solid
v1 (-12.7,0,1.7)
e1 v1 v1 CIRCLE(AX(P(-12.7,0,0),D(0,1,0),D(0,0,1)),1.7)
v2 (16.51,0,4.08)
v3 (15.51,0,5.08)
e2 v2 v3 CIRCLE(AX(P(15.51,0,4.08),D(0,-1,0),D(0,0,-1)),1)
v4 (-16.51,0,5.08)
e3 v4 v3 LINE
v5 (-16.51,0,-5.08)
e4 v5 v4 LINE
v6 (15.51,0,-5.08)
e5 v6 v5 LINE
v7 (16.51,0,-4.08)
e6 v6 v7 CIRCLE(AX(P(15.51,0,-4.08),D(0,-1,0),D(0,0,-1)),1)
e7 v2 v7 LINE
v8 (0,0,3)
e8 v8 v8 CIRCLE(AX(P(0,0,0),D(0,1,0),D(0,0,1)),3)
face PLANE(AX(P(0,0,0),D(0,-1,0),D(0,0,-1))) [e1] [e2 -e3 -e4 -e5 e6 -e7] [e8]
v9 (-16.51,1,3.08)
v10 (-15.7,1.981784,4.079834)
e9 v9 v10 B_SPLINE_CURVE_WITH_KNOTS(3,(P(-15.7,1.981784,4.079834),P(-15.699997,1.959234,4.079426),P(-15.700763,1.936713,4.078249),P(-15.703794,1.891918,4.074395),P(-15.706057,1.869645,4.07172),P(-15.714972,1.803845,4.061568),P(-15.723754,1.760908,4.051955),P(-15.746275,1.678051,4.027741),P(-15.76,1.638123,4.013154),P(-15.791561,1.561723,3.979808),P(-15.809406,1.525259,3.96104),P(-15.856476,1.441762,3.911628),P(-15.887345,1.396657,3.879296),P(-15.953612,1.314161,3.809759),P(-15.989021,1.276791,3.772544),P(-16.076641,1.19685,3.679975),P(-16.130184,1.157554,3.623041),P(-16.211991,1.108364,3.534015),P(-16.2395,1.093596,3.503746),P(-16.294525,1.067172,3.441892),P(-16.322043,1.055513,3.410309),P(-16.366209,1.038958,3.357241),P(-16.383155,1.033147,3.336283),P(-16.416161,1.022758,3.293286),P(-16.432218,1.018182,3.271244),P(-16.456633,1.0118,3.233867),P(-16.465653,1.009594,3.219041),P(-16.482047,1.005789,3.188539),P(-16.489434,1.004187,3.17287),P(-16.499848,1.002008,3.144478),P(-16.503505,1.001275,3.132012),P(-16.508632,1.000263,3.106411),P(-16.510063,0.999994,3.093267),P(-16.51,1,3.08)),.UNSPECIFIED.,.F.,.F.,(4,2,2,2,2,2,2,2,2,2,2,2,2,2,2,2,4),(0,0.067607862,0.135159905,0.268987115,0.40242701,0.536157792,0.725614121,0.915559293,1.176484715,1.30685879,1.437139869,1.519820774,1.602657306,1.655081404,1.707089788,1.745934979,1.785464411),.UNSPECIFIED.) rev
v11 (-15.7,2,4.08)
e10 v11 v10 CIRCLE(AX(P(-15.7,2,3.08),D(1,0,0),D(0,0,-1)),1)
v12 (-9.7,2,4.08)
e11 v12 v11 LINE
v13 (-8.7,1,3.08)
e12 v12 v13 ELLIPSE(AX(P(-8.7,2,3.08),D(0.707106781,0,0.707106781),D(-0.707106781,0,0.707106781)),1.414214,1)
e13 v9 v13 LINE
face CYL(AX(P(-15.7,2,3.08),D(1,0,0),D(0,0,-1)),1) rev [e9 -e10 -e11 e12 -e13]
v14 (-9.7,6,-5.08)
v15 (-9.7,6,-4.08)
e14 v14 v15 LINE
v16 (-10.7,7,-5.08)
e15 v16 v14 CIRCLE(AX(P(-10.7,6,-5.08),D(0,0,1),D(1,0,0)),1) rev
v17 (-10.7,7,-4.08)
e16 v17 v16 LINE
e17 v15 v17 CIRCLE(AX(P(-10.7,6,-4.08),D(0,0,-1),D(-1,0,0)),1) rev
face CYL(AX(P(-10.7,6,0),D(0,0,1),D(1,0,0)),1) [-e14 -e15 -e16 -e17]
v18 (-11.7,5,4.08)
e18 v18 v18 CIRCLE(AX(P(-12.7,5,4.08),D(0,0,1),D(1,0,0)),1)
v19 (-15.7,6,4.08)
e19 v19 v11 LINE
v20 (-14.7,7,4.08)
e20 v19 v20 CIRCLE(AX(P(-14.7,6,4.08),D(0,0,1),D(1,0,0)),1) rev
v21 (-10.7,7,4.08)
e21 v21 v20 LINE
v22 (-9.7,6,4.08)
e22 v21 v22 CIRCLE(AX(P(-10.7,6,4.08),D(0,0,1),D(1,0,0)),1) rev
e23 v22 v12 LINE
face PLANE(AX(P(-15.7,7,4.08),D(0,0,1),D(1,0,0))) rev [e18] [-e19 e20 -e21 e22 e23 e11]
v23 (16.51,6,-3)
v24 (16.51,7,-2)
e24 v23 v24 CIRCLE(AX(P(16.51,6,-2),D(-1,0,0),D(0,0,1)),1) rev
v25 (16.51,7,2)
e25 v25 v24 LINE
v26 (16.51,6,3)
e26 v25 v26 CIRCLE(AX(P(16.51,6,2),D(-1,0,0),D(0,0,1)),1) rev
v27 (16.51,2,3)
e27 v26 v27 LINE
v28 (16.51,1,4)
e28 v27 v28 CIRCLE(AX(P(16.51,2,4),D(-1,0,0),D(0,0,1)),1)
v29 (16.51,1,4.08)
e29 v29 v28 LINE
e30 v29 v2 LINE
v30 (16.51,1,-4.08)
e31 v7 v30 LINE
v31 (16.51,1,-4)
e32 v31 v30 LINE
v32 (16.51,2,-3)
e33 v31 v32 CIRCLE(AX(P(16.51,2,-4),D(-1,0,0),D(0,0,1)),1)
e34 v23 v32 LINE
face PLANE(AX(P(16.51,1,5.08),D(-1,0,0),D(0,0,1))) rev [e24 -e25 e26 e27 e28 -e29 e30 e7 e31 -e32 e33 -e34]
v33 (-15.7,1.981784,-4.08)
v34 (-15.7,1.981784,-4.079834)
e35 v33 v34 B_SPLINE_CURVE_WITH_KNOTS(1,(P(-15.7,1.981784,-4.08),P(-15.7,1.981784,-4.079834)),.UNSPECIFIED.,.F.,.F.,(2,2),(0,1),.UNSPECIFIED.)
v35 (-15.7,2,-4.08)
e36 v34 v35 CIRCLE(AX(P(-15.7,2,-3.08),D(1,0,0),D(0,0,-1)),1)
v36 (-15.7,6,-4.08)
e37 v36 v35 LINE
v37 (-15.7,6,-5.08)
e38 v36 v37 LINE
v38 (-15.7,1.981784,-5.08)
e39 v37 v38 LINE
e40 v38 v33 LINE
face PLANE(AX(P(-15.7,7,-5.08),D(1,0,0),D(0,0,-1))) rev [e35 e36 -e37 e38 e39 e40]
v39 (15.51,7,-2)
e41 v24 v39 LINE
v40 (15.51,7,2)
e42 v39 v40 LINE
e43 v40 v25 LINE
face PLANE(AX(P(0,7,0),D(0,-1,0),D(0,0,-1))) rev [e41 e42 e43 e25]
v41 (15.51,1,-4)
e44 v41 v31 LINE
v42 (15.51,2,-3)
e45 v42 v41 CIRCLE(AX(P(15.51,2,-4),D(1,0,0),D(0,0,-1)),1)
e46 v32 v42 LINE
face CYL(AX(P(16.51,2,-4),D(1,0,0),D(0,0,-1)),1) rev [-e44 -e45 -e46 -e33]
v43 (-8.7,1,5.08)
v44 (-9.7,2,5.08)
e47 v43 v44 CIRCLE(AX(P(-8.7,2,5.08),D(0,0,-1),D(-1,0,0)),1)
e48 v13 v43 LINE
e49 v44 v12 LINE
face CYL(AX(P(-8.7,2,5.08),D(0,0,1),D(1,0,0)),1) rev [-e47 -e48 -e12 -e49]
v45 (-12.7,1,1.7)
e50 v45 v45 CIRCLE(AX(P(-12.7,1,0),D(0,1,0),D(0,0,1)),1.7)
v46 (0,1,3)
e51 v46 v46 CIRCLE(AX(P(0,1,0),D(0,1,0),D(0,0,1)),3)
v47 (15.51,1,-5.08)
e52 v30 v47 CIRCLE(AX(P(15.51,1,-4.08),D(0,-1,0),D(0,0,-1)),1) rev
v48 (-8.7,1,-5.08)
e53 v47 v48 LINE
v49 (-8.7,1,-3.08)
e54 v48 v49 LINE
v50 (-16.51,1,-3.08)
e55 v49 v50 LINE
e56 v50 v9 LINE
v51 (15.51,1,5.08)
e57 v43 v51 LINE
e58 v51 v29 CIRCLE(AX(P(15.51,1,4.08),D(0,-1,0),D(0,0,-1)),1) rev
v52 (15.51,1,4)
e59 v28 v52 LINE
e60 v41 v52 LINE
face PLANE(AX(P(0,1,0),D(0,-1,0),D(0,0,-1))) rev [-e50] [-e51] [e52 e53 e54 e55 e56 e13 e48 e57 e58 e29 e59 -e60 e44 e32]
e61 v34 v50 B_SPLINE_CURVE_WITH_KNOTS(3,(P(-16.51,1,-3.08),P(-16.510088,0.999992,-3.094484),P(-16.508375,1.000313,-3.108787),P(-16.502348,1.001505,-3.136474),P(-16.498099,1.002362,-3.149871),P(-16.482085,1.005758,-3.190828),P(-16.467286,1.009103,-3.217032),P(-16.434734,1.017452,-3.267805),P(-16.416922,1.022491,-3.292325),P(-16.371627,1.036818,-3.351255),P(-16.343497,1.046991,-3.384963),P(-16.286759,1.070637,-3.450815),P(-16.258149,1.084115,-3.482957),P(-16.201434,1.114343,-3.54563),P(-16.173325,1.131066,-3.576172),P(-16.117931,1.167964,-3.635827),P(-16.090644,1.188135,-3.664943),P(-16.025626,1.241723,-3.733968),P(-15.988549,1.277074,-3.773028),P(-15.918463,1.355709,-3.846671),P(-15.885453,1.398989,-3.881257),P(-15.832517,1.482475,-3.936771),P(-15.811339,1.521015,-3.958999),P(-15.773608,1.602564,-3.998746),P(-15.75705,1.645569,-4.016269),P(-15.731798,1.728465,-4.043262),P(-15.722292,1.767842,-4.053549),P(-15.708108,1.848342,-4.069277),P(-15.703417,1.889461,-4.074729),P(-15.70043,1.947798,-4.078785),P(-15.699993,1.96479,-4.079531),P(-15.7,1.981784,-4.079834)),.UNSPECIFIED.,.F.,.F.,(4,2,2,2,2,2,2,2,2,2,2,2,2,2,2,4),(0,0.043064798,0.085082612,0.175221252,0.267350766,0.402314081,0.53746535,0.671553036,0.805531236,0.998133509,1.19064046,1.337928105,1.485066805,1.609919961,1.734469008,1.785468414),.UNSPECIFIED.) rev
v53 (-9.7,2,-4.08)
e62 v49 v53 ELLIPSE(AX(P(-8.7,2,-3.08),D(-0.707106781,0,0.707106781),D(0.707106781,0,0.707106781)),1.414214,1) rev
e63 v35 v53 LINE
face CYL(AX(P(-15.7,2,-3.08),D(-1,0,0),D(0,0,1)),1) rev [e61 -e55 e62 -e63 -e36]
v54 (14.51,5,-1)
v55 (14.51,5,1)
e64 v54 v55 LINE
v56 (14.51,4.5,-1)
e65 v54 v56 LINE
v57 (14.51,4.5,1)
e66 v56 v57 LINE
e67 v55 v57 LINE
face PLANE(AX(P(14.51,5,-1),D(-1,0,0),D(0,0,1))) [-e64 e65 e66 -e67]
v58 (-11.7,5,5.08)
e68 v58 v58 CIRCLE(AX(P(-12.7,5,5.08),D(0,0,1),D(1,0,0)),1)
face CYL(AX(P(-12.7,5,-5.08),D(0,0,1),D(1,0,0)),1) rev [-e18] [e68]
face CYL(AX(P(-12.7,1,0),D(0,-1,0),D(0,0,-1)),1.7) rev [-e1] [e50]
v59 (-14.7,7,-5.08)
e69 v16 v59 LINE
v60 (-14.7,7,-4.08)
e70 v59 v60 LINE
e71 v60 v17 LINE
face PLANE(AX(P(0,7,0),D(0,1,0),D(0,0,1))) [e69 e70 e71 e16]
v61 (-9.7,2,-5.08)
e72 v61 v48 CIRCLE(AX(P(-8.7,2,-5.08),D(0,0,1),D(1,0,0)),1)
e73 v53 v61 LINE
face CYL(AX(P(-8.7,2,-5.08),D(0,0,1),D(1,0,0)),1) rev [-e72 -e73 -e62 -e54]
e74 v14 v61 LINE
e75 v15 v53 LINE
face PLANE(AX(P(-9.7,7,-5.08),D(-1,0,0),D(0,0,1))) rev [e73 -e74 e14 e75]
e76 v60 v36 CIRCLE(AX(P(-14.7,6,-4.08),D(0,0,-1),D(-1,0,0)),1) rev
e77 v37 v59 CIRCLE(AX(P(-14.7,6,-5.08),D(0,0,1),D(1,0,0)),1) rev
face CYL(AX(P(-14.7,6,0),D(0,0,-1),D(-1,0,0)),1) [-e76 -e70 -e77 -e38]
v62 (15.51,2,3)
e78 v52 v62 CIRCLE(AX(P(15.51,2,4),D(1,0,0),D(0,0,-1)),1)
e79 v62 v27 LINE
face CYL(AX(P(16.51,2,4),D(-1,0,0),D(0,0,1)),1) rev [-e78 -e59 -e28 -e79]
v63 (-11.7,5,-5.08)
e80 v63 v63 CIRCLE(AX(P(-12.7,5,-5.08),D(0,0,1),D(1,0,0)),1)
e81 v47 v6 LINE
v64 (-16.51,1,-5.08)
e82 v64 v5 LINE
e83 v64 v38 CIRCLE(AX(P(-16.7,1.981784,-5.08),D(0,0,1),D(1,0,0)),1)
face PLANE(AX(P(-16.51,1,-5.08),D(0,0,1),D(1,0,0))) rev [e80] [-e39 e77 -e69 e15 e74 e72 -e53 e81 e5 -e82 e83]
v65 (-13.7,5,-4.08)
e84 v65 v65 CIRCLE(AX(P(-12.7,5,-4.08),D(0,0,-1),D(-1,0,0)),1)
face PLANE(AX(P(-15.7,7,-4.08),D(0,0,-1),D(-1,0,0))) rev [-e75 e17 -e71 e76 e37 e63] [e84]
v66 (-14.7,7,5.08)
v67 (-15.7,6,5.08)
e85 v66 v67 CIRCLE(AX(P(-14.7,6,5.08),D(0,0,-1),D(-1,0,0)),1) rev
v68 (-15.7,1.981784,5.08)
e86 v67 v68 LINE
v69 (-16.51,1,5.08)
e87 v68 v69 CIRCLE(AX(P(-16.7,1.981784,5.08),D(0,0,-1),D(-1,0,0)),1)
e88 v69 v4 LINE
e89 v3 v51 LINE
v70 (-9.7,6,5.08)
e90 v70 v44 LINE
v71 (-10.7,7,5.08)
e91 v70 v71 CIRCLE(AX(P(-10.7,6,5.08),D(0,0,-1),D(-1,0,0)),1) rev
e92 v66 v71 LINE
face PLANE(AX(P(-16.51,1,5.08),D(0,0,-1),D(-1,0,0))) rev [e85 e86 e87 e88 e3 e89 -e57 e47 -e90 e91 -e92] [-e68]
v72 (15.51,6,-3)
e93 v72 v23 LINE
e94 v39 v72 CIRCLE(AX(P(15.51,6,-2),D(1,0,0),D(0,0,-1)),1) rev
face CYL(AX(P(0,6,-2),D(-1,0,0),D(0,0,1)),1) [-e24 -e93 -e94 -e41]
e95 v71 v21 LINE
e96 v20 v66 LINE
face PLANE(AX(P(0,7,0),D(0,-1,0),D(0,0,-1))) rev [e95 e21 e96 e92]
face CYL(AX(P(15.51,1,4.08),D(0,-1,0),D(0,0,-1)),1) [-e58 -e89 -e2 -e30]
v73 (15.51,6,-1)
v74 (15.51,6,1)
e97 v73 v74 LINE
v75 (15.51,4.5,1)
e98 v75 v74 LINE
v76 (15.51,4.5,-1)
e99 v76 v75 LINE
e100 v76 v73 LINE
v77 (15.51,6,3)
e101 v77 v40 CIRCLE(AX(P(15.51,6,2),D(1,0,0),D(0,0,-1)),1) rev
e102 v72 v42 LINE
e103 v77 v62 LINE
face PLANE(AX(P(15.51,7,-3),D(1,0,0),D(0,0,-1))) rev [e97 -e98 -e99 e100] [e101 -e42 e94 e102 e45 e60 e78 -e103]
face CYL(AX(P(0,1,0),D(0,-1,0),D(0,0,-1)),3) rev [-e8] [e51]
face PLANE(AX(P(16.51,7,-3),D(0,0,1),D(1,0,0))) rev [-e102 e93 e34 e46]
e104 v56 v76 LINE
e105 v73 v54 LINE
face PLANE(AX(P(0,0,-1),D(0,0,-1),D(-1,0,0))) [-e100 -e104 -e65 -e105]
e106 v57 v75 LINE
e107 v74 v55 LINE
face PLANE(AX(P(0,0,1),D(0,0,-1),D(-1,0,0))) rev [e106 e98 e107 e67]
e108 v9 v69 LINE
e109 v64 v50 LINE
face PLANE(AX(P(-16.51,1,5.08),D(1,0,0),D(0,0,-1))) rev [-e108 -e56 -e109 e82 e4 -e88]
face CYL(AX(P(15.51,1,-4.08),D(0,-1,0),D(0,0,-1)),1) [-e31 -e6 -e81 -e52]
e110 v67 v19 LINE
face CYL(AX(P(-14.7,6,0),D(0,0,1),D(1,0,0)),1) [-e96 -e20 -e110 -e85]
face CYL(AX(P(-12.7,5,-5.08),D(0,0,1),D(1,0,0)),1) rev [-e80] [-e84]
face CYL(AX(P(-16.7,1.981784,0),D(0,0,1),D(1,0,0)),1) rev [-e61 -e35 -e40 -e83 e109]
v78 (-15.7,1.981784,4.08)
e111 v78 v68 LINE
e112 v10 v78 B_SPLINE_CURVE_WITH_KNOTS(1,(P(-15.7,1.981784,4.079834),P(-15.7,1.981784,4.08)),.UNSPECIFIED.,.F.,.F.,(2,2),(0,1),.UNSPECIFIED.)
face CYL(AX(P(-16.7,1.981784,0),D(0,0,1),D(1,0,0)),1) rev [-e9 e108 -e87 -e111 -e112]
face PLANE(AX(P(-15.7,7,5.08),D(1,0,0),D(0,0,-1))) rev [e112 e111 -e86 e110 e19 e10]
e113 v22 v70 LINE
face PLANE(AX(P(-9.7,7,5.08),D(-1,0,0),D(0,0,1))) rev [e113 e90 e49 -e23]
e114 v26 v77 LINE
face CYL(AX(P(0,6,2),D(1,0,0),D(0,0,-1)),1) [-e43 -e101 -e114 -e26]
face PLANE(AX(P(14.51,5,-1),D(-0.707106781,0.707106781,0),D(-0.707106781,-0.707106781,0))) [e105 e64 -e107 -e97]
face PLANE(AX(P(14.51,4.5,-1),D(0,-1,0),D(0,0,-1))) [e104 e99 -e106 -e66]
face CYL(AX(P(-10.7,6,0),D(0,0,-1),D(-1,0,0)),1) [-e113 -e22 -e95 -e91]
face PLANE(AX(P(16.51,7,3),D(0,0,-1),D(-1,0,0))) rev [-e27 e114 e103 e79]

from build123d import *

# Parameters (mm, degrees)
SKETCH1_W                = 33.02
SKETCH1_H                = 10.16
SKETCH1_R                = 3
SKETCH1_R_2              = 1.7
BOSS_EXTRUDE1_DEPTH      = 1
SKETCH2_W                = 6
SKETCH2_H                = 1
SKETCH2_W_2              = 1
SKETCH2_H_2              = 6
BOSS_EXTRUDE2_DEPTH      = 6
SKETCH3_R                = 1
CUT_EXTRUDE1_DEPTH       = 21.610815122
FILLET1_R                = 1
BOSS_EXTRUDE3_DEPTH      = 1
BOSS_EXTRUDE3_DEPTH_BACK = 1


with BuildPart() as part:
    # Sketch1 → Boss-Extrude1 (new body)
    with BuildSketch(Plane(origin=(0, 0, 0), x_dir=(1, 0, 0), z_dir=(0, 1, 0))):
        Rectangle(SKETCH1_W, SKETCH1_H)
        with Locations(Location((0, 0, 0), (0, 0, 270))):
            Circle(SKETCH1_R, mode=Mode.SUBTRACT)
        with Locations(Location((-12.7, 0, 0), (0, 0, 270))):
            Circle(SKETCH1_R_2, mode=Mode.SUBTRACT)
    extrude(amount=BOSS_EXTRUDE1_DEPTH)

    # Sketch2 → Boss-Extrude2 (add)
    with BuildSketch(Plane(origin=(0, 1, 0), x_dir=(1, 0, 0), z_dir=(0, 1, 0))):
        with Locations((-12.7, 4.58)):
            Rectangle(SKETCH2_W, SKETCH2_H)
        with Locations((-12.7, -4.58)):
            Rectangle(SKETCH2_W, SKETCH2_H)
        with Locations((16.01, 0)):
            Rectangle(SKETCH2_W_2, SKETCH2_H_2)
    extrude(amount=BOSS_EXTRUDE2_DEPTH)

    # Sketch3 → Cut-Extrude1 (cut, through all)
    with BuildSketch(Plane.XY.offset(5.08)):
        with Locations((-12.7, 5)):
            Circle(SKETCH3_R)
    extrude(amount=-CUT_EXTRUDE1_DEPTH, mode=Mode.SUBTRACT)

    # Fillet1
    # the kernel refuses this fillet: 1 mm, written as the material it adds along each edge
    with BuildSketch(Plane(origin=(-15.7, 1, -4.08), x_dir=(-1, 0, 0), z_dir=(0, 0, -1))) as fillet1_piece_1:
        with BuildLine():
            CenterArc((1, 0.98178409), FILLET1_R, 180, 79.047215801)
            Line((0, 0.98178409), (0, 0))
            Line((0, 0), (0.81, 0))
        make_face()
    extrude(amount=1)
    with BuildSketch(Plane(origin=(-9.7, 1, -4.08), x_dir=(0, 0, 1), z_dir=(-1, 0, 0))) as fillet1_piece_2:
        with BuildLine():
            CenterArc((FILLET1_R, FILLET1_R), FILLET1_R, 180, 90)
            Line((0, FILLET1_R), (0, 0))
            Line((0, 0), (FILLET1_R, 0))
        make_face()
    extrude(amount=6)
    with BuildSketch(Plane(origin=(-9.7, 1, -5.08), x_dir=(1, 0, 0), z_dir=(0, 0, 1))) as fillet1_piece_3:
        with BuildLine():
            CenterArc((FILLET1_R, FILLET1_R), FILLET1_R, 180, 90)
            Line((0, FILLET1_R), (0, 0))
            Line((0, 0), (FILLET1_R, 0))
        make_face()
    extrude(amount=1)
    with BuildSketch(Plane(origin=(16.51, 1, -3), x_dir=(0, 0, -1), z_dir=(-1, 0, 0)), Plane(origin=(15.51, 1, 3), x_dir=(0, 0, 1), z_dir=(1, 0, 0)), Plane(origin=(-9.7, 1, 5.08), x_dir=(1, 0, 0), z_dir=(0, 0, -1))) as fillet1_piece_4:
        with BuildLine():
            CenterArc((FILLET1_R, -FILLET1_R), FILLET1_R, 90, 90)
            Line((0, -FILLET1_R), (0, 0))
            Line((0, 0), (FILLET1_R, 0))
        make_face()
    extrude(amount=1)
    with BuildSketch(Plane(origin=(-15.7, 1, 4.08), x_dir=(-1, 0, 0), z_dir=(0, 0, 1))) as fillet1_piece_5:
        with BuildLine():
            CenterArc((1, -0.98178409), FILLET1_R, 100.952784199, 79.047215801)
            Line((0, -0.98178409), (0, 0))
            Line((0, 0), (0.81, 0))
        make_face()
    extrude(amount=1)
    with BuildSketch(Plane(origin=(-9.7, 1, 4.08), x_dir=(0, 0, -1), z_dir=(-1, 0, 0))) as fillet1_piece_6:
        with BuildLine():
            CenterArc((FILLET1_R, -FILLET1_R), FILLET1_R, 90, 90)
            Line((0, -FILLET1_R), (0, 0))
            Line((0, 0), (FILLET1_R, 0))
        make_face()
    extrude(amount=6)
    with BuildSketch(Plane(origin=(-15.7, 1, -1.625539774), x_dir=(-1, 0, 0), z_dir=(0, 0, -1))) as fillet1_piece_7a_section:
        with BuildLine():
            CenterArc((1, 0.98178409), FILLET1_R, 180, 79.047215801)
            Line((0, 0.98178409), (0, 0))
            Line((0, 0), (0.81, 0))
        make_face()
    fillet1_piece_7a = extrude(amount=3.454460226, mode=Mode.PRIVATE)
    fillet1_piece_7a = split(fillet1_piece_7a, bisect_by=Plane(origin=(-15.7, 1, -4.08), z_dir=(0, 0, 1)), keep=Keep.TOP, mode=Mode.PRIVATE)
    with BuildSketch(Plane(origin=(-9.7, 1, -4.08), x_dir=(0, 0, 1), z_dir=(-1, 0, 0))) as fillet1_piece_7b_section:
        with BuildLine():
            CenterArc((FILLET1_R, FILLET1_R), FILLET1_R, 180, 90)
            Line((0, FILLET1_R), (0, 0))
            Line((0, 0), (FILLET1_R, 0))
        make_face()
    fillet1_piece_7b = extrude(amount=8.5, mode=Mode.PRIVATE)
    fillet1_piece_7b = split(fillet1_piece_7b, bisect_by=Plane(origin=(-16.51, 1, -4.08), z_dir=(1, 0, 0)), keep=Keep.TOP, mode=Mode.PRIVATE)
    fillet1_piece_7b = split(fillet1_piece_7b, bisect_by=Plane(origin=(-15.7, 1, -4.08), z_dir=(-1, 0, 0)), keep=Keep.TOP, mode=Mode.PRIVATE)
    fillet1_piece_7 = fillet1_piece_7a & fillet1_piece_7b
    add(fillet1_piece_7)
    with BuildSketch(Plane(origin=(-7.2, 1, -4.08), x_dir=(0, 0, 1), z_dir=(-1, 0, 0))) as fillet1_piece_8a_section:
        with BuildLine():
            CenterArc((FILLET1_R, FILLET1_R), FILLET1_R, 180, 90)
            Line((0, FILLET1_R), (0, 0))
            Line((0, 0), (FILLET1_R, 0))
        make_face()
    fillet1_piece_8a = extrude(amount=8.5, mode=Mode.PRIVATE)
    fillet1_piece_8a = split(fillet1_piece_8a, bisect_by=Plane(origin=(-9.7, 1, -4.08), z_dir=(1, 0, 0)), keep=Keep.TOP, mode=Mode.PRIVATE)
    with BuildSketch(Plane(origin=(-9.7, 1, -5.08), x_dir=(1, 0, 0), z_dir=(0, 0, 1))) as fillet1_piece_8b_section:
        with BuildLine():
            CenterArc((FILLET1_R, FILLET1_R), FILLET1_R, 180, 90)
            Line((0, FILLET1_R), (0, 0))
            Line((0, 0), (FILLET1_R, 0))
        make_face()
    fillet1_piece_8b = extrude(amount=3.5, mode=Mode.PRIVATE)
    fillet1_piece_8b = split(fillet1_piece_8b, bisect_by=Plane(origin=(-9.7, 1, -4.08), z_dir=(0, 0, 1)), keep=Keep.TOP, mode=Mode.PRIVATE)
    fillet1_piece_8 = fillet1_piece_8a & fillet1_piece_8b
    add(fillet1_piece_8)
    with BuildSketch(Plane(origin=(-9.7, 1, 4.08), x_dir=(0, 0, -1), z_dir=(-1, 0, 0))) as fillet1_piece_9a_section:
        with BuildLine():
            CenterArc((FILLET1_R, -FILLET1_R), FILLET1_R, 90, 90)
            Line((0, -FILLET1_R), (0, 0))
            Line((0, 0), (FILLET1_R, 0))
        make_face()
    fillet1_piece_9a = extrude(amount=8.5, mode=Mode.PRIVATE)
    fillet1_piece_9a = split(fillet1_piece_9a, bisect_by=Plane(origin=(-16.51, 1, 4.08), z_dir=(1, 0, 0)), keep=Keep.TOP, mode=Mode.PRIVATE)
    fillet1_piece_9a = split(fillet1_piece_9a, bisect_by=Plane(origin=(-15.7, 1, 4.08), z_dir=(-1, 0, 0)), keep=Keep.TOP, mode=Mode.PRIVATE)
    with BuildSketch(Plane(origin=(-15.7, 1, 1.625539774), x_dir=(-1, 0, 0), z_dir=(0, 0, 1))) as fillet1_piece_9b_section:
        with BuildLine():
            CenterArc((1, -0.98178409), FILLET1_R, 100.952784199, 79.047215801)
            Line((0, -0.98178409), (0, 0))
            Line((0, 0), (0.81, 0))
        make_face()
    fillet1_piece_9b = extrude(amount=3.454460226, mode=Mode.PRIVATE)
    fillet1_piece_9b = split(fillet1_piece_9b, bisect_by=Plane(origin=(-15.7, 1, 4.08), z_dir=(0, 0, -1)), keep=Keep.TOP, mode=Mode.PRIVATE)
    fillet1_piece_9 = fillet1_piece_9a & fillet1_piece_9b
    add(fillet1_piece_9)
    with BuildSketch(Plane(origin=(-9.7, 1, 5.08), x_dir=(1, 0, 0), z_dir=(0, 0, -1))) as fillet1_piece_10a_section:
        with BuildLine():
            CenterArc((FILLET1_R, -FILLET1_R), FILLET1_R, 90, 90)
            Line((0, -FILLET1_R), (0, 0))
            Line((0, 0), (FILLET1_R, 0))
        make_face()
    fillet1_piece_10a = extrude(amount=3.5, mode=Mode.PRIVATE)
    fillet1_piece_10a = split(fillet1_piece_10a, bisect_by=Plane(origin=(-9.7, 1, 4.08), z_dir=(0, 0, -1)), keep=Keep.TOP, mode=Mode.PRIVATE)
    with BuildSketch(Plane(origin=(-7.2, 1, 4.08), x_dir=(0, 0, -1), z_dir=(-1, 0, 0))) as fillet1_piece_10b_section:
        with BuildLine():
            CenterArc((FILLET1_R, -FILLET1_R), FILLET1_R, 90, 90)
            Line((0, -FILLET1_R), (0, 0))
            Line((0, 0), (FILLET1_R, 0))
        make_face()
    fillet1_piece_10b = extrude(amount=8.5, mode=Mode.PRIVATE)
    fillet1_piece_10b = split(fillet1_piece_10b, bisect_by=Plane(origin=(-9.7, 1, 4.08), z_dir=(1, 0, 0)), keep=Keep.TOP, mode=Mode.PRIVATE)
    fillet1_piece_10 = fillet1_piece_10a & fillet1_piece_10b
    add(fillet1_piece_10)
    # the kernel refuses this fillet: 1 mm, written as the material it takes off along each edge
    with BuildSketch(Plane(origin=(-15.7, 7, -1.58), x_dir=(0, -1, 0), z_dir=(0, 0, -1)), Plane(origin=(13.01, 7, 3), x_dir=(0, 0, -1), z_dir=(1, 0, 0)), Plane(origin=(-15.7, 7, 1.58), x_dir=(1, 0, 0), z_dir=(0, 0, 1)), Plane(origin=(16.51, -2.5, 5.08), x_dir=(-1, 0, 0), z_dir=(0, 1, 0))) as fillet1_2_piece_1:
        with BuildLine():
            CenterArc((FILLET1_R, -FILLET1_R), FILLET1_R, 90, 90)
            Line((0, -FILLET1_R), (0, 0))
            Line((0, 0), (FILLET1_R, 0))
        make_face()
    extrude(amount=6, mode=Mode.SUBTRACT)
    with BuildSketch(Plane(origin=(-9.7, 7, -7.58), x_dir=(-1, 0, 0), z_dir=(0, 0, 1)), Plane(origin=(19.01, 7, -3), x_dir=(0, -1, 0), z_dir=(-1, 0, 0)), Plane(origin=(-9.7, 7, 7.58), x_dir=(0, -1, 0), z_dir=(0, 0, -1)), Plane(origin=(16.51, -2.5, -5.08), x_dir=(-1, 0, 0), z_dir=(0, 1, 0))) as fillet1_2_piece_2:
        with BuildLine():
            CenterArc((FILLET1_R, FILLET1_R), FILLET1_R, 180, 90)
            Line((0, FILLET1_R), (0, 0))
            Line((0, 0), (FILLET1_R, 0))
        make_face()
    extrude(amount=6, mode=Mode.SUBTRACT)

    # Sketch4 → Boss-Extrude3 (add, two sides: drawn at the far end of the back side and taken through both)
    with BuildSketch(Plane.XY.offset(-BOSS_EXTRUDE3_DEPTH_BACK)):
        Polygon((14.51, 5), (15.51, 6), (15.51, 4.5), (14.51, 4.5), align=None)
    extrude(amount=BOSS_EXTRUDE3_DEPTH + BOSS_EXTRUDE3_DEPTH_BACK)


solid = part.part
